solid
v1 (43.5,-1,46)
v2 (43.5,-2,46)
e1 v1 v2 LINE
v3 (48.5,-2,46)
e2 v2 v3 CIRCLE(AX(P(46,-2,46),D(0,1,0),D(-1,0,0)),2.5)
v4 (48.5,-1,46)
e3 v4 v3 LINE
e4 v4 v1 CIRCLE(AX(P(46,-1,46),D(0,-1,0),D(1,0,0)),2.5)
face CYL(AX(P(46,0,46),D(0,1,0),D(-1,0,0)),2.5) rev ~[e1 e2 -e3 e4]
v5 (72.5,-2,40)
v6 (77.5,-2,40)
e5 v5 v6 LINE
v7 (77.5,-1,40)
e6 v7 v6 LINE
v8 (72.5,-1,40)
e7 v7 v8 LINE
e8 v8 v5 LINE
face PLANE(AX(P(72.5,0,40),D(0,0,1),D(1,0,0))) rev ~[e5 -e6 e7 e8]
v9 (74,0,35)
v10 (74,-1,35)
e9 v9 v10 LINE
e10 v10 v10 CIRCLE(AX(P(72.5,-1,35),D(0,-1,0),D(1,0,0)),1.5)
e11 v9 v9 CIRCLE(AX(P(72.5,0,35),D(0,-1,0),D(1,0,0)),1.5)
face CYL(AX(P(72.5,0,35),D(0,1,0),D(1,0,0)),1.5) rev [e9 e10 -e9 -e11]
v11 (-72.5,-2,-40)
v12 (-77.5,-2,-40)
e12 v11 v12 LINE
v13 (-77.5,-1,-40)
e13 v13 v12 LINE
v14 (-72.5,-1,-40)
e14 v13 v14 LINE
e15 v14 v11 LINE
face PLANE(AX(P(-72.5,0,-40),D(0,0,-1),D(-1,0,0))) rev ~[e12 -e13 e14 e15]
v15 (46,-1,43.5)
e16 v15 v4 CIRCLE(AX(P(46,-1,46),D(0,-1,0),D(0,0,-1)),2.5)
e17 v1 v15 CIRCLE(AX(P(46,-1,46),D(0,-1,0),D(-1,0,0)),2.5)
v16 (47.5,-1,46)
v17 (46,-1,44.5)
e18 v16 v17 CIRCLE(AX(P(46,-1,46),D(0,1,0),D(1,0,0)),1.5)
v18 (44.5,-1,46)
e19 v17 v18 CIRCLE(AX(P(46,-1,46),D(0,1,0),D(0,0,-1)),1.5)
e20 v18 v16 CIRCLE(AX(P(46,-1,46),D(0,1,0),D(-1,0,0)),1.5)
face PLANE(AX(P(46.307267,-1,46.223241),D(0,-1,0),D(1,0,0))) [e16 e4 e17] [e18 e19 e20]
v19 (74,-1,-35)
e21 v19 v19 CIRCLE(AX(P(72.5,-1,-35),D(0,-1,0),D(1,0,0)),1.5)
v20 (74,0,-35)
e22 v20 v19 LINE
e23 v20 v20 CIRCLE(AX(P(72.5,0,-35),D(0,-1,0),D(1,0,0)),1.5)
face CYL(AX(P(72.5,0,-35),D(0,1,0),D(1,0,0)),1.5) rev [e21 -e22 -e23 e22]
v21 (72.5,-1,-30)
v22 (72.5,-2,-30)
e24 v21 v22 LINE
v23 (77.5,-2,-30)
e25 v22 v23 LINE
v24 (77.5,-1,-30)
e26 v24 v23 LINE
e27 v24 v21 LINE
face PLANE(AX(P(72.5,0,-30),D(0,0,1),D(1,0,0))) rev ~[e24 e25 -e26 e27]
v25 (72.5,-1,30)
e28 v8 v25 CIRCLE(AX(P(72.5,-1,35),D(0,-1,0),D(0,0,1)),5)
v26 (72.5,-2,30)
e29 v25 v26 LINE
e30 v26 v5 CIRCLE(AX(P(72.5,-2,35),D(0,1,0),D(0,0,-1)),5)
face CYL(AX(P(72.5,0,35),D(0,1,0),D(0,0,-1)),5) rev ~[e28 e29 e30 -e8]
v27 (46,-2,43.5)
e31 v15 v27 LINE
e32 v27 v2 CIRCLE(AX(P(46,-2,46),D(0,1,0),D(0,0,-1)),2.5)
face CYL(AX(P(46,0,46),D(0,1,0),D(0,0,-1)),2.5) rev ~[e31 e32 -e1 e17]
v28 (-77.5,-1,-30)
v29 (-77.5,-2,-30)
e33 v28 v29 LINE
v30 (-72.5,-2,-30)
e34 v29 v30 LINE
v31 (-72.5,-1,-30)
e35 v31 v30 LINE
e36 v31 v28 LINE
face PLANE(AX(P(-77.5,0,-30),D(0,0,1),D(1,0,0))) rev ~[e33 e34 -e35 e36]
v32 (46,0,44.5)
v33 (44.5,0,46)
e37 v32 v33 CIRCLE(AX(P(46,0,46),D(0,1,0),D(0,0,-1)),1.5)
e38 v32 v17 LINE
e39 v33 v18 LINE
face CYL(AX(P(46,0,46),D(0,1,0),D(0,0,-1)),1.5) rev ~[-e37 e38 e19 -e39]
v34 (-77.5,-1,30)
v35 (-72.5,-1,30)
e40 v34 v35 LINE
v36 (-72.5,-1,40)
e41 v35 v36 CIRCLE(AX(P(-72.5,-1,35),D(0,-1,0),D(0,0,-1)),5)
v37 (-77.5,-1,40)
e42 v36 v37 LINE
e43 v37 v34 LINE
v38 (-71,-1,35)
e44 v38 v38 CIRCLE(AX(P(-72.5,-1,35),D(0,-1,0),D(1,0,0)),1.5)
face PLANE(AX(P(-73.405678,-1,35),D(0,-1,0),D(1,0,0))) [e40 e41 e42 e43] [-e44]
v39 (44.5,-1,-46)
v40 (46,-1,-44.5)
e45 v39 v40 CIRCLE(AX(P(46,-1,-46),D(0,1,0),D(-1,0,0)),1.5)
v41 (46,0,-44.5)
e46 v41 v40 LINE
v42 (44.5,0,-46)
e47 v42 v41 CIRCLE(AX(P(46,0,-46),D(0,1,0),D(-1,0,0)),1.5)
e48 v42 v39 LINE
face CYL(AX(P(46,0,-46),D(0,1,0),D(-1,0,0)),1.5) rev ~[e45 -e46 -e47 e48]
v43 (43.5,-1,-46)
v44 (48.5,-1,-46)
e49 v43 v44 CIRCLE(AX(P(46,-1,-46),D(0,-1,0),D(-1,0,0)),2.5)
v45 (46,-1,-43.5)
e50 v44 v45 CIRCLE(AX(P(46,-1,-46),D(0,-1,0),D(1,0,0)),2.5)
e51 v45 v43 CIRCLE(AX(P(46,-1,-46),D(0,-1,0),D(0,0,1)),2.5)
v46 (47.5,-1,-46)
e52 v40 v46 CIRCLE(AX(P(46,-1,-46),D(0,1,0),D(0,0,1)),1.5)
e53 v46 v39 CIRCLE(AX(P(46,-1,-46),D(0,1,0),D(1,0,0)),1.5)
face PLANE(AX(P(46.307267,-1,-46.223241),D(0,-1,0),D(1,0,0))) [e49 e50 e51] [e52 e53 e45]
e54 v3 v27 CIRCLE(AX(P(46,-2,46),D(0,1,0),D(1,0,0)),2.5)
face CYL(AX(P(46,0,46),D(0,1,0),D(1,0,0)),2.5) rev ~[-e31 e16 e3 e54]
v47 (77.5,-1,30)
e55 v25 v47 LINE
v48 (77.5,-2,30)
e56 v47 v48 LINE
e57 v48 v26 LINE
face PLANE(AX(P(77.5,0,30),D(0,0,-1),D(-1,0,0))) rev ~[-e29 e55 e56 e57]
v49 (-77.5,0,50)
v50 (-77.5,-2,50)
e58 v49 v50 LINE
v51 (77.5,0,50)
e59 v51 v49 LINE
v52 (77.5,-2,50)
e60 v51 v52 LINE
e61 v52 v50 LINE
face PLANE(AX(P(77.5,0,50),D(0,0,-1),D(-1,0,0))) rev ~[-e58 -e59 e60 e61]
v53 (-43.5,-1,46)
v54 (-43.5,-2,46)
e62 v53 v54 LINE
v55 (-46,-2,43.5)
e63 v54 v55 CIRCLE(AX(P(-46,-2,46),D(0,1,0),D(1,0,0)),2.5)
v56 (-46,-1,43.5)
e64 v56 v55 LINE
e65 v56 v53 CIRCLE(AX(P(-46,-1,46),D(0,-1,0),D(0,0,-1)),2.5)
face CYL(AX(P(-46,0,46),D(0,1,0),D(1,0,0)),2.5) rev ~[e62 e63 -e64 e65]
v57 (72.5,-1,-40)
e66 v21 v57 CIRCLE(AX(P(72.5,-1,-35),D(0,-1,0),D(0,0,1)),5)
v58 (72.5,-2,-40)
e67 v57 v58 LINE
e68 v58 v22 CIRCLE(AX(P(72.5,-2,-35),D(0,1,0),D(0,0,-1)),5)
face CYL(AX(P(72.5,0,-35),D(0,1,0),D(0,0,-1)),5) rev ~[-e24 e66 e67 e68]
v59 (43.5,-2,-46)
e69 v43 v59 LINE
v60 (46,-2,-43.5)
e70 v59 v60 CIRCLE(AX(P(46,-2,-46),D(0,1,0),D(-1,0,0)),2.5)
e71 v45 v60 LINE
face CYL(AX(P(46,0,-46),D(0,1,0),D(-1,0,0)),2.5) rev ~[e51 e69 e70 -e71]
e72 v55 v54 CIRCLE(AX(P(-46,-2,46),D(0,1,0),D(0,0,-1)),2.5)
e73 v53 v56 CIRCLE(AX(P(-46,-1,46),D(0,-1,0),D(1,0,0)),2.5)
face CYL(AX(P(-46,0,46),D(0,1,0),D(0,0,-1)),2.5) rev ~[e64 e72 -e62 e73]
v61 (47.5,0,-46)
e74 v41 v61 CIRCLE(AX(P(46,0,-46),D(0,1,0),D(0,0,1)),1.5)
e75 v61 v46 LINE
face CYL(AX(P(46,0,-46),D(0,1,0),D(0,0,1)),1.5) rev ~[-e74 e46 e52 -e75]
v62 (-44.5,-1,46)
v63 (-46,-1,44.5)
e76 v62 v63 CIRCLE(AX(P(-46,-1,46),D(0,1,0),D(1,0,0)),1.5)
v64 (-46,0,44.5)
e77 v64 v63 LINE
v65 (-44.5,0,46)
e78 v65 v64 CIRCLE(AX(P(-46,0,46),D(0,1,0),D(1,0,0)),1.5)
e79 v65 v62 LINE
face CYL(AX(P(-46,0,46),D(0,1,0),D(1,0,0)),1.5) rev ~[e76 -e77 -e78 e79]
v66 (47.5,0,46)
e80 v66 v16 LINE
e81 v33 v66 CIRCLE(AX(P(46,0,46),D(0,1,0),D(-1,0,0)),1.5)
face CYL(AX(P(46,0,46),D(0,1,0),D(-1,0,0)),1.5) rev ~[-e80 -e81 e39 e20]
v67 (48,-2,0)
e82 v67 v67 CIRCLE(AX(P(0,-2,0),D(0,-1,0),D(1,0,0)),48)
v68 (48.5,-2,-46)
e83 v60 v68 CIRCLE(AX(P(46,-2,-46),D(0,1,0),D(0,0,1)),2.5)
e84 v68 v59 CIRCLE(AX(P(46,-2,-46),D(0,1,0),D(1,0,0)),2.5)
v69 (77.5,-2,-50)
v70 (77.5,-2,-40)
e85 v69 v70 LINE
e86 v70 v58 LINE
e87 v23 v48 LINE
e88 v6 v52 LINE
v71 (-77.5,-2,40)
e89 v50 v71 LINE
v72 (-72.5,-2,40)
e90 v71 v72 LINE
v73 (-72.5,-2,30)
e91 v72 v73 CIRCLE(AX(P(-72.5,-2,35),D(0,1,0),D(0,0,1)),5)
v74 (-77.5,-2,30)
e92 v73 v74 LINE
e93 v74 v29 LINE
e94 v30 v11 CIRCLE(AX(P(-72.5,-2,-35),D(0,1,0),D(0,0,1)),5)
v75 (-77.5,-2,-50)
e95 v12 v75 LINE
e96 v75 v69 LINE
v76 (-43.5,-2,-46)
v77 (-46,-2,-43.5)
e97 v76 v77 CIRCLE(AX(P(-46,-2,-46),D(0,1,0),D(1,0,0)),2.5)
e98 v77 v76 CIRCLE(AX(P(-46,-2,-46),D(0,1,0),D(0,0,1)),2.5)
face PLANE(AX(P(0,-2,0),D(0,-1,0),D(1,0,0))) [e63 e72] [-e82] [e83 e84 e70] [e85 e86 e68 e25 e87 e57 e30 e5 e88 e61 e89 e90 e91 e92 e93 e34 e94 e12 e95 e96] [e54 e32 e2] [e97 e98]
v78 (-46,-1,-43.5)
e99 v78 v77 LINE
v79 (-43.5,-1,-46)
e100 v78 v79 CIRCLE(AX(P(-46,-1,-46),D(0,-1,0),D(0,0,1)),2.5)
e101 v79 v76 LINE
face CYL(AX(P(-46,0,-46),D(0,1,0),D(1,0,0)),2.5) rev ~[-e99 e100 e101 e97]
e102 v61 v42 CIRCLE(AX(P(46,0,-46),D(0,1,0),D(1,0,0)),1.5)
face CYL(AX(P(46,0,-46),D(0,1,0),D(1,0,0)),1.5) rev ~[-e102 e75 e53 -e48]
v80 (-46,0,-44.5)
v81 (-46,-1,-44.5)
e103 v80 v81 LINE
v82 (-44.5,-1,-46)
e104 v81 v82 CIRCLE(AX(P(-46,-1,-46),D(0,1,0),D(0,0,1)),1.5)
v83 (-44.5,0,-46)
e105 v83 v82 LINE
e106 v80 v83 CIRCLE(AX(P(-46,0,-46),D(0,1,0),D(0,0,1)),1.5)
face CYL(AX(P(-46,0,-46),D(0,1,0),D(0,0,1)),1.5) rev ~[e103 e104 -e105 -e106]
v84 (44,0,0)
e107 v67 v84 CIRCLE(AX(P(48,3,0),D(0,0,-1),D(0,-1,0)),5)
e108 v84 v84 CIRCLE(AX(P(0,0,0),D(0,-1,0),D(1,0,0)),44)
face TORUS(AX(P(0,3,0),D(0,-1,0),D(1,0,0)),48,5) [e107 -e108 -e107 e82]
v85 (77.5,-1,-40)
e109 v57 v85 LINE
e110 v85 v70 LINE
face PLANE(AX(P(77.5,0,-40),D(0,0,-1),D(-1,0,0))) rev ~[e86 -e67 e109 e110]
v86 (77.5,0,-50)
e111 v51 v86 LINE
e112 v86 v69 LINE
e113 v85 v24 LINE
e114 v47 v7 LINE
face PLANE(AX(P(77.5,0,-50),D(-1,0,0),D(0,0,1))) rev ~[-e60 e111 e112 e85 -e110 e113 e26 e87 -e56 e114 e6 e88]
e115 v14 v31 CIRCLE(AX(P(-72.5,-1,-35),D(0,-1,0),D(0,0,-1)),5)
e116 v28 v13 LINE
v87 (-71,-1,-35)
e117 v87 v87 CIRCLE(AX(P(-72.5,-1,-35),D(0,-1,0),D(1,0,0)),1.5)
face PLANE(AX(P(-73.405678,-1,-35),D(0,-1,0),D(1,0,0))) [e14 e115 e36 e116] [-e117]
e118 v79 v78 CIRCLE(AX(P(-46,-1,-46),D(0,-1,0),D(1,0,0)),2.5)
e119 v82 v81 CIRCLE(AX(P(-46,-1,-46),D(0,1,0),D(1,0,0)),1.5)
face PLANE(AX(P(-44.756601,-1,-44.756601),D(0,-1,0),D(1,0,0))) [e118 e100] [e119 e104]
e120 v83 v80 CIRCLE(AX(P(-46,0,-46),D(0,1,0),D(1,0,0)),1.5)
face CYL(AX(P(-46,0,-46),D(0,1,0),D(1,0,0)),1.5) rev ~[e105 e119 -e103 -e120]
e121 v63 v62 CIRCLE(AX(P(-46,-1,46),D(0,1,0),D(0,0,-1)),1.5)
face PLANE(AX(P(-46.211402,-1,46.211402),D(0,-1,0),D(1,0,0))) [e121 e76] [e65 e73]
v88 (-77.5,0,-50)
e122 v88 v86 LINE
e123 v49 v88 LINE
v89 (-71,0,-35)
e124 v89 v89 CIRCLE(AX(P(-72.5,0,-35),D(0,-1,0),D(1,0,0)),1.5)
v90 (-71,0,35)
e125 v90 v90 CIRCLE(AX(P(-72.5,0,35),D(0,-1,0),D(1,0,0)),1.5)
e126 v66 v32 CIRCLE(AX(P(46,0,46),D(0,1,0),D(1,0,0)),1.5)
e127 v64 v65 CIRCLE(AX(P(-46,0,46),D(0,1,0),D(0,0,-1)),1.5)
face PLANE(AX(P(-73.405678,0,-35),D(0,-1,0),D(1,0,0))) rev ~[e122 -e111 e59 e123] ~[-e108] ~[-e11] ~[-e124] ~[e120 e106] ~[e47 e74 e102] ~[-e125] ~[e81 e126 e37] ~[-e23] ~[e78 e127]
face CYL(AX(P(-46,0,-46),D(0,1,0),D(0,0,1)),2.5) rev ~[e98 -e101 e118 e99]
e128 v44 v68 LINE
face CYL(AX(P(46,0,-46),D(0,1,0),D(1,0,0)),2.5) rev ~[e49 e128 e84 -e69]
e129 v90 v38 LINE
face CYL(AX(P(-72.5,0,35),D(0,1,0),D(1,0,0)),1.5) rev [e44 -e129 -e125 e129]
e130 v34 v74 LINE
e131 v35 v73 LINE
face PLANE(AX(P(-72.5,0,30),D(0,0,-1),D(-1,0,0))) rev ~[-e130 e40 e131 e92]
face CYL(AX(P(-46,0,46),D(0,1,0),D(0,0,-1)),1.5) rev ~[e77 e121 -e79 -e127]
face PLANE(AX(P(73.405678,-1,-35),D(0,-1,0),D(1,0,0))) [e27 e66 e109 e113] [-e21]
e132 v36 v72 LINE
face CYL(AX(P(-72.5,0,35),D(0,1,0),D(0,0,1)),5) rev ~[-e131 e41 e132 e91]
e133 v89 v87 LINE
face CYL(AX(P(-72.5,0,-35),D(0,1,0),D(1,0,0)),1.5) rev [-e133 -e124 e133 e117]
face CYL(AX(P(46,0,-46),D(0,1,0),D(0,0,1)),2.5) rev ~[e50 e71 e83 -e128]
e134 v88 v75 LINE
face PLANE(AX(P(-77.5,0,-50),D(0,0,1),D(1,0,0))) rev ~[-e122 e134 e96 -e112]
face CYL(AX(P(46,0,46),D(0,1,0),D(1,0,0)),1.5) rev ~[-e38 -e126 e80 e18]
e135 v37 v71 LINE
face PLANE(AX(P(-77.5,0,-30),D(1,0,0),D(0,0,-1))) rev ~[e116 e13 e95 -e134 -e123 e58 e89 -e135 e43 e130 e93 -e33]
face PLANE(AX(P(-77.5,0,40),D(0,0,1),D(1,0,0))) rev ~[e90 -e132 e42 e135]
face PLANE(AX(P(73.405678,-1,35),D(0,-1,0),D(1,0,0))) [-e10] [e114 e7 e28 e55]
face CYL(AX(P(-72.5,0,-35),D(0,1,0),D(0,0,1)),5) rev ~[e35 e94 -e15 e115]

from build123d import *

# Parameters (mm, degrees)
F0_R     = 44
F1_DEPTH = 2
F0_R_2   = 1.5
F2_DEPTH = 1


# Not quite as in the source:
# - a fillet or chamfer that OpenCascade refuses, or shapes differently, is made with other operations: its cross-section is extruded or revolved along the edge and cut away or added


with BuildPart() as f1:
    # F0 (on Front) → F1 (new body)
    with BuildSketch(Plane.XZ):
        with BuildLine():
            Line((-77.5, -50), (77.5, -50))
            Line((77.5, -50), (77.5, -40))
            Line((77.5, -40), (72.5, -40))
            ThreePointArc((72.5, -40), (67.5, -35), (72.5, -30))
            Line((72.5, -30), (77.5, -30))
            Line((77.5, -30), (77.5, 30))
            Line((77.5, 30), (72.5, 30))
            ThreePointArc((72.5, 30), (67.5, 35), (72.5, 40))
            Line((72.5, 40), (77.5, 40))
            Line((77.5, 40), (77.5, 50))
            Line((77.5, 50), (-77.5, 50))
            Line((-77.5, 50), (-77.5, 40))
            Line((-77.5, 40), (-72.5, 40))
            ThreePointArc((-72.5, 40), (-67.5, 35), (-72.5, 30))
            Line((-72.5, 30), (-77.5, 30))
            Line((-77.5, 30), (-77.5, -30))
            Line((-77.5, -30), (-72.5, -30))
            ThreePointArc((-72.5, -30), (-67.5, -35), (-72.5, -40))
            Line((-72.5, -40), (-77.5, -40))
            Line((-77.5, -40), (-77.5, -50))
        make_face()
        with BuildLine():
            Line((43.5, -46), (-43.5, -46))
            ThreePointArc((-43.5, -46), (-47.767766953, -47.767766953), (-46, -43.5))
            Line((-46, -43.5), (-46, 43.5))
            ThreePointArc((-46, 43.5), (-47.767766953, 47.767766953), (-43.5, 46))
            Line((-43.5, 46), (43.5, 46))
            ThreePointArc((43.5, 46), (46, 48.5), (48.5, 46))
            ThreePointArc((48.5, 46), (47.767766953, 44.232233047), (46, 43.5))
            Line((46, 43.5), (46, -43.5))
            ThreePointArc((46, -43.5), (47.767766953, -44.232233047), (48.5, -46))
            ThreePointArc((48.5, -46), (46, -48.5), (43.5, -46))
        make_face(mode=Mode.SUBTRACT)
        with BuildLine():
            ThreePointArc((-46, -43.5), (-44.232233047, -44.232233047), (-43.5, -46))
            Line((-43.5, -46), (43.5, -46))
            ThreePointArc((43.5, -46), (44.232233047, -44.232233047), (46, -43.5))
            Line((46, -43.5), (46, 43.5))
            ThreePointArc((46, 43.5), (44.232233047, 44.232233047), (43.5, 46))
            Line((43.5, 46), (-43.5, 46))
            ThreePointArc((-43.5, 46), (-44.232233047, 44.232233047), (-46, 43.5))
            Line((-46, 43.5), (-46, -43.5))
        make_face()
        Circle(F0_R, mode=Mode.SUBTRACT)
    extrude(amount=F1_DEPTH)

    # F0 (on Front) → F2 (join)
    with BuildSketch(Plane.XZ):
        with BuildLine():
            Line((-77.5, -30), (-77.5, -40))
            Line((-77.5, -40), (-72.5, -40))
            ThreePointArc((-72.5, -40), (-67.5, -35), (-72.5, -30))
            Line((-72.5, -30), (-77.5, -30))
        make_face()
        with Locations((-72.5, -35)):
            Circle(F0_R_2, mode=Mode.SUBTRACT)
        with BuildLine():
            Line((-77.5, 40), (-77.5, 30))
            Line((-77.5, 30), (-72.5, 30))
            ThreePointArc((-72.5, 30), (-67.5, 35), (-72.5, 40))
            Line((-72.5, 40), (-77.5, 40))
        make_face()
        with Locations((-72.5, 35)):
            Circle(F0_R_2, mode=Mode.SUBTRACT)
        with BuildLine():
            Line((72.5, 30), (77.5, 30))
            Line((77.5, 30), (77.5, 40))
            Line((77.5, 40), (72.5, 40))
            ThreePointArc((72.5, 40), (67.5, 35), (72.5, 30))
        make_face()
        with Locations((72.5, 35)):
            Circle(F0_R_2, mode=Mode.SUBTRACT)
        with BuildLine():
            Line((72.5, -40), (77.5, -40))
            Line((77.5, -40), (77.5, -30))
            Line((77.5, -30), (72.5, -30))
            ThreePointArc((72.5, -30), (67.5, -35), (72.5, -40))
        make_face()
        with Locations((72.5, -35)):
            Circle(F0_R_2, mode=Mode.SUBTRACT)
        with BuildLine():
            ThreePointArc((-43.5, 46), (-47.767766953, 47.767766953), (-46, 43.5))
            Line((-46, 43.5), (-46, 44.5))
            ThreePointArc((-46, 44.5), (-47.0606601718, 47.0606601718), (-44.5, 46))
            Line((-44.5, 46), (-43.5, 46))
        make_face()
        with BuildLine():
            Line((-46, 44.5), (-46, 43.5))
            ThreePointArc((-46, 43.5), (-44.232233047, 44.232233047), (-43.5, 46))
            Line((-43.5, 46), (-44.5, 46))
            ThreePointArc((-44.5, 46), (-44.9393398282, 44.9393398282), (-46, 44.5))
        make_face()
        with BuildLine():
            Line((46, 44.5), (46, 43.5))
            ThreePointArc((46, 43.5), (47.767766953, 44.232233047), (48.5, 46))
            ThreePointArc((48.5, 46), (46, 48.5), (43.5, 46))
            Line((43.5, 46), (44.5, 46))
            ThreePointArc((44.5, 46), (46, 47.5), (47.5, 46))
            ThreePointArc((47.5, 46), (47.0606601718, 44.9393398282), (46, 44.5))
        make_face()
        with BuildLine():
            ThreePointArc((43.5, 46), (44.232233047, 44.232233047), (46, 43.5))
            Line((46, 43.5), (46, 44.5))
            ThreePointArc((46, 44.5), (44.9393398282, 44.9393398282), (44.5, 46))
            Line((44.5, 46), (43.5, 46))
        make_face()
        with BuildLine():
            Line((44.5, -46), (43.5, -46))
            ThreePointArc((43.5, -46), (46, -48.5), (48.5, -46))
            ThreePointArc((48.5, -46), (47.767766953, -44.232233047), (46, -43.5))
            Line((46, -43.5), (46, -44.5))
            ThreePointArc((46, -44.5), (47.0606601718, -44.9393398282), (47.5, -46))
            ThreePointArc((47.5, -46), (46, -47.5), (44.5, -46))
        make_face()
        with BuildLine():
            ThreePointArc((46, -43.5), (44.232233047, -44.232233047), (43.5, -46))
            Line((43.5, -46), (44.5, -46))
            ThreePointArc((44.5, -46), (44.9393398282, -44.9393398282), (46, -44.5))
            Line((46, -44.5), (46, -43.5))
        make_face()
        with BuildLine():
            Line((-44.5, -46), (-43.5, -46))
            ThreePointArc((-43.5, -46), (-44.232233047, -44.232233047), (-46, -43.5))
            Line((-46, -43.5), (-46, -44.5))
            ThreePointArc((-46, -44.5), (-44.9393398282, -44.9393398282), (-44.5, -46))
        make_face()
        with BuildLine():
            ThreePointArc((-46, -43.5), (-47.767766953, -47.767766953), (-43.5, -46))
            Line((-43.5, -46), (-44.5, -46))
            ThreePointArc((-44.5, -46), (-47.0606601718, -47.0606601718), (-46, -44.5))
            Line((-46, -44.5), (-46, -43.5))
        make_face()
    extrude(amount=F2_DEPTH)

    # F3: fillet of radius 5 on 1 edges, made by hand

    # F3_s1 → F3_t2 (revolve, cut)
    with BuildSketch(Plane.XY):
        with BuildLine():
            ThreePointArc((48, -2), (45.7639320225, -1.472135955), (44, 0))
            Line((44, 0), (44, -2))
            Line((44, -2), (48, -2))
        make_face()
    revolve(axis=Axis((0, -2, 0), (0, -1, 0)), mode=Mode.SUBTRACT)


solid = f1.part
